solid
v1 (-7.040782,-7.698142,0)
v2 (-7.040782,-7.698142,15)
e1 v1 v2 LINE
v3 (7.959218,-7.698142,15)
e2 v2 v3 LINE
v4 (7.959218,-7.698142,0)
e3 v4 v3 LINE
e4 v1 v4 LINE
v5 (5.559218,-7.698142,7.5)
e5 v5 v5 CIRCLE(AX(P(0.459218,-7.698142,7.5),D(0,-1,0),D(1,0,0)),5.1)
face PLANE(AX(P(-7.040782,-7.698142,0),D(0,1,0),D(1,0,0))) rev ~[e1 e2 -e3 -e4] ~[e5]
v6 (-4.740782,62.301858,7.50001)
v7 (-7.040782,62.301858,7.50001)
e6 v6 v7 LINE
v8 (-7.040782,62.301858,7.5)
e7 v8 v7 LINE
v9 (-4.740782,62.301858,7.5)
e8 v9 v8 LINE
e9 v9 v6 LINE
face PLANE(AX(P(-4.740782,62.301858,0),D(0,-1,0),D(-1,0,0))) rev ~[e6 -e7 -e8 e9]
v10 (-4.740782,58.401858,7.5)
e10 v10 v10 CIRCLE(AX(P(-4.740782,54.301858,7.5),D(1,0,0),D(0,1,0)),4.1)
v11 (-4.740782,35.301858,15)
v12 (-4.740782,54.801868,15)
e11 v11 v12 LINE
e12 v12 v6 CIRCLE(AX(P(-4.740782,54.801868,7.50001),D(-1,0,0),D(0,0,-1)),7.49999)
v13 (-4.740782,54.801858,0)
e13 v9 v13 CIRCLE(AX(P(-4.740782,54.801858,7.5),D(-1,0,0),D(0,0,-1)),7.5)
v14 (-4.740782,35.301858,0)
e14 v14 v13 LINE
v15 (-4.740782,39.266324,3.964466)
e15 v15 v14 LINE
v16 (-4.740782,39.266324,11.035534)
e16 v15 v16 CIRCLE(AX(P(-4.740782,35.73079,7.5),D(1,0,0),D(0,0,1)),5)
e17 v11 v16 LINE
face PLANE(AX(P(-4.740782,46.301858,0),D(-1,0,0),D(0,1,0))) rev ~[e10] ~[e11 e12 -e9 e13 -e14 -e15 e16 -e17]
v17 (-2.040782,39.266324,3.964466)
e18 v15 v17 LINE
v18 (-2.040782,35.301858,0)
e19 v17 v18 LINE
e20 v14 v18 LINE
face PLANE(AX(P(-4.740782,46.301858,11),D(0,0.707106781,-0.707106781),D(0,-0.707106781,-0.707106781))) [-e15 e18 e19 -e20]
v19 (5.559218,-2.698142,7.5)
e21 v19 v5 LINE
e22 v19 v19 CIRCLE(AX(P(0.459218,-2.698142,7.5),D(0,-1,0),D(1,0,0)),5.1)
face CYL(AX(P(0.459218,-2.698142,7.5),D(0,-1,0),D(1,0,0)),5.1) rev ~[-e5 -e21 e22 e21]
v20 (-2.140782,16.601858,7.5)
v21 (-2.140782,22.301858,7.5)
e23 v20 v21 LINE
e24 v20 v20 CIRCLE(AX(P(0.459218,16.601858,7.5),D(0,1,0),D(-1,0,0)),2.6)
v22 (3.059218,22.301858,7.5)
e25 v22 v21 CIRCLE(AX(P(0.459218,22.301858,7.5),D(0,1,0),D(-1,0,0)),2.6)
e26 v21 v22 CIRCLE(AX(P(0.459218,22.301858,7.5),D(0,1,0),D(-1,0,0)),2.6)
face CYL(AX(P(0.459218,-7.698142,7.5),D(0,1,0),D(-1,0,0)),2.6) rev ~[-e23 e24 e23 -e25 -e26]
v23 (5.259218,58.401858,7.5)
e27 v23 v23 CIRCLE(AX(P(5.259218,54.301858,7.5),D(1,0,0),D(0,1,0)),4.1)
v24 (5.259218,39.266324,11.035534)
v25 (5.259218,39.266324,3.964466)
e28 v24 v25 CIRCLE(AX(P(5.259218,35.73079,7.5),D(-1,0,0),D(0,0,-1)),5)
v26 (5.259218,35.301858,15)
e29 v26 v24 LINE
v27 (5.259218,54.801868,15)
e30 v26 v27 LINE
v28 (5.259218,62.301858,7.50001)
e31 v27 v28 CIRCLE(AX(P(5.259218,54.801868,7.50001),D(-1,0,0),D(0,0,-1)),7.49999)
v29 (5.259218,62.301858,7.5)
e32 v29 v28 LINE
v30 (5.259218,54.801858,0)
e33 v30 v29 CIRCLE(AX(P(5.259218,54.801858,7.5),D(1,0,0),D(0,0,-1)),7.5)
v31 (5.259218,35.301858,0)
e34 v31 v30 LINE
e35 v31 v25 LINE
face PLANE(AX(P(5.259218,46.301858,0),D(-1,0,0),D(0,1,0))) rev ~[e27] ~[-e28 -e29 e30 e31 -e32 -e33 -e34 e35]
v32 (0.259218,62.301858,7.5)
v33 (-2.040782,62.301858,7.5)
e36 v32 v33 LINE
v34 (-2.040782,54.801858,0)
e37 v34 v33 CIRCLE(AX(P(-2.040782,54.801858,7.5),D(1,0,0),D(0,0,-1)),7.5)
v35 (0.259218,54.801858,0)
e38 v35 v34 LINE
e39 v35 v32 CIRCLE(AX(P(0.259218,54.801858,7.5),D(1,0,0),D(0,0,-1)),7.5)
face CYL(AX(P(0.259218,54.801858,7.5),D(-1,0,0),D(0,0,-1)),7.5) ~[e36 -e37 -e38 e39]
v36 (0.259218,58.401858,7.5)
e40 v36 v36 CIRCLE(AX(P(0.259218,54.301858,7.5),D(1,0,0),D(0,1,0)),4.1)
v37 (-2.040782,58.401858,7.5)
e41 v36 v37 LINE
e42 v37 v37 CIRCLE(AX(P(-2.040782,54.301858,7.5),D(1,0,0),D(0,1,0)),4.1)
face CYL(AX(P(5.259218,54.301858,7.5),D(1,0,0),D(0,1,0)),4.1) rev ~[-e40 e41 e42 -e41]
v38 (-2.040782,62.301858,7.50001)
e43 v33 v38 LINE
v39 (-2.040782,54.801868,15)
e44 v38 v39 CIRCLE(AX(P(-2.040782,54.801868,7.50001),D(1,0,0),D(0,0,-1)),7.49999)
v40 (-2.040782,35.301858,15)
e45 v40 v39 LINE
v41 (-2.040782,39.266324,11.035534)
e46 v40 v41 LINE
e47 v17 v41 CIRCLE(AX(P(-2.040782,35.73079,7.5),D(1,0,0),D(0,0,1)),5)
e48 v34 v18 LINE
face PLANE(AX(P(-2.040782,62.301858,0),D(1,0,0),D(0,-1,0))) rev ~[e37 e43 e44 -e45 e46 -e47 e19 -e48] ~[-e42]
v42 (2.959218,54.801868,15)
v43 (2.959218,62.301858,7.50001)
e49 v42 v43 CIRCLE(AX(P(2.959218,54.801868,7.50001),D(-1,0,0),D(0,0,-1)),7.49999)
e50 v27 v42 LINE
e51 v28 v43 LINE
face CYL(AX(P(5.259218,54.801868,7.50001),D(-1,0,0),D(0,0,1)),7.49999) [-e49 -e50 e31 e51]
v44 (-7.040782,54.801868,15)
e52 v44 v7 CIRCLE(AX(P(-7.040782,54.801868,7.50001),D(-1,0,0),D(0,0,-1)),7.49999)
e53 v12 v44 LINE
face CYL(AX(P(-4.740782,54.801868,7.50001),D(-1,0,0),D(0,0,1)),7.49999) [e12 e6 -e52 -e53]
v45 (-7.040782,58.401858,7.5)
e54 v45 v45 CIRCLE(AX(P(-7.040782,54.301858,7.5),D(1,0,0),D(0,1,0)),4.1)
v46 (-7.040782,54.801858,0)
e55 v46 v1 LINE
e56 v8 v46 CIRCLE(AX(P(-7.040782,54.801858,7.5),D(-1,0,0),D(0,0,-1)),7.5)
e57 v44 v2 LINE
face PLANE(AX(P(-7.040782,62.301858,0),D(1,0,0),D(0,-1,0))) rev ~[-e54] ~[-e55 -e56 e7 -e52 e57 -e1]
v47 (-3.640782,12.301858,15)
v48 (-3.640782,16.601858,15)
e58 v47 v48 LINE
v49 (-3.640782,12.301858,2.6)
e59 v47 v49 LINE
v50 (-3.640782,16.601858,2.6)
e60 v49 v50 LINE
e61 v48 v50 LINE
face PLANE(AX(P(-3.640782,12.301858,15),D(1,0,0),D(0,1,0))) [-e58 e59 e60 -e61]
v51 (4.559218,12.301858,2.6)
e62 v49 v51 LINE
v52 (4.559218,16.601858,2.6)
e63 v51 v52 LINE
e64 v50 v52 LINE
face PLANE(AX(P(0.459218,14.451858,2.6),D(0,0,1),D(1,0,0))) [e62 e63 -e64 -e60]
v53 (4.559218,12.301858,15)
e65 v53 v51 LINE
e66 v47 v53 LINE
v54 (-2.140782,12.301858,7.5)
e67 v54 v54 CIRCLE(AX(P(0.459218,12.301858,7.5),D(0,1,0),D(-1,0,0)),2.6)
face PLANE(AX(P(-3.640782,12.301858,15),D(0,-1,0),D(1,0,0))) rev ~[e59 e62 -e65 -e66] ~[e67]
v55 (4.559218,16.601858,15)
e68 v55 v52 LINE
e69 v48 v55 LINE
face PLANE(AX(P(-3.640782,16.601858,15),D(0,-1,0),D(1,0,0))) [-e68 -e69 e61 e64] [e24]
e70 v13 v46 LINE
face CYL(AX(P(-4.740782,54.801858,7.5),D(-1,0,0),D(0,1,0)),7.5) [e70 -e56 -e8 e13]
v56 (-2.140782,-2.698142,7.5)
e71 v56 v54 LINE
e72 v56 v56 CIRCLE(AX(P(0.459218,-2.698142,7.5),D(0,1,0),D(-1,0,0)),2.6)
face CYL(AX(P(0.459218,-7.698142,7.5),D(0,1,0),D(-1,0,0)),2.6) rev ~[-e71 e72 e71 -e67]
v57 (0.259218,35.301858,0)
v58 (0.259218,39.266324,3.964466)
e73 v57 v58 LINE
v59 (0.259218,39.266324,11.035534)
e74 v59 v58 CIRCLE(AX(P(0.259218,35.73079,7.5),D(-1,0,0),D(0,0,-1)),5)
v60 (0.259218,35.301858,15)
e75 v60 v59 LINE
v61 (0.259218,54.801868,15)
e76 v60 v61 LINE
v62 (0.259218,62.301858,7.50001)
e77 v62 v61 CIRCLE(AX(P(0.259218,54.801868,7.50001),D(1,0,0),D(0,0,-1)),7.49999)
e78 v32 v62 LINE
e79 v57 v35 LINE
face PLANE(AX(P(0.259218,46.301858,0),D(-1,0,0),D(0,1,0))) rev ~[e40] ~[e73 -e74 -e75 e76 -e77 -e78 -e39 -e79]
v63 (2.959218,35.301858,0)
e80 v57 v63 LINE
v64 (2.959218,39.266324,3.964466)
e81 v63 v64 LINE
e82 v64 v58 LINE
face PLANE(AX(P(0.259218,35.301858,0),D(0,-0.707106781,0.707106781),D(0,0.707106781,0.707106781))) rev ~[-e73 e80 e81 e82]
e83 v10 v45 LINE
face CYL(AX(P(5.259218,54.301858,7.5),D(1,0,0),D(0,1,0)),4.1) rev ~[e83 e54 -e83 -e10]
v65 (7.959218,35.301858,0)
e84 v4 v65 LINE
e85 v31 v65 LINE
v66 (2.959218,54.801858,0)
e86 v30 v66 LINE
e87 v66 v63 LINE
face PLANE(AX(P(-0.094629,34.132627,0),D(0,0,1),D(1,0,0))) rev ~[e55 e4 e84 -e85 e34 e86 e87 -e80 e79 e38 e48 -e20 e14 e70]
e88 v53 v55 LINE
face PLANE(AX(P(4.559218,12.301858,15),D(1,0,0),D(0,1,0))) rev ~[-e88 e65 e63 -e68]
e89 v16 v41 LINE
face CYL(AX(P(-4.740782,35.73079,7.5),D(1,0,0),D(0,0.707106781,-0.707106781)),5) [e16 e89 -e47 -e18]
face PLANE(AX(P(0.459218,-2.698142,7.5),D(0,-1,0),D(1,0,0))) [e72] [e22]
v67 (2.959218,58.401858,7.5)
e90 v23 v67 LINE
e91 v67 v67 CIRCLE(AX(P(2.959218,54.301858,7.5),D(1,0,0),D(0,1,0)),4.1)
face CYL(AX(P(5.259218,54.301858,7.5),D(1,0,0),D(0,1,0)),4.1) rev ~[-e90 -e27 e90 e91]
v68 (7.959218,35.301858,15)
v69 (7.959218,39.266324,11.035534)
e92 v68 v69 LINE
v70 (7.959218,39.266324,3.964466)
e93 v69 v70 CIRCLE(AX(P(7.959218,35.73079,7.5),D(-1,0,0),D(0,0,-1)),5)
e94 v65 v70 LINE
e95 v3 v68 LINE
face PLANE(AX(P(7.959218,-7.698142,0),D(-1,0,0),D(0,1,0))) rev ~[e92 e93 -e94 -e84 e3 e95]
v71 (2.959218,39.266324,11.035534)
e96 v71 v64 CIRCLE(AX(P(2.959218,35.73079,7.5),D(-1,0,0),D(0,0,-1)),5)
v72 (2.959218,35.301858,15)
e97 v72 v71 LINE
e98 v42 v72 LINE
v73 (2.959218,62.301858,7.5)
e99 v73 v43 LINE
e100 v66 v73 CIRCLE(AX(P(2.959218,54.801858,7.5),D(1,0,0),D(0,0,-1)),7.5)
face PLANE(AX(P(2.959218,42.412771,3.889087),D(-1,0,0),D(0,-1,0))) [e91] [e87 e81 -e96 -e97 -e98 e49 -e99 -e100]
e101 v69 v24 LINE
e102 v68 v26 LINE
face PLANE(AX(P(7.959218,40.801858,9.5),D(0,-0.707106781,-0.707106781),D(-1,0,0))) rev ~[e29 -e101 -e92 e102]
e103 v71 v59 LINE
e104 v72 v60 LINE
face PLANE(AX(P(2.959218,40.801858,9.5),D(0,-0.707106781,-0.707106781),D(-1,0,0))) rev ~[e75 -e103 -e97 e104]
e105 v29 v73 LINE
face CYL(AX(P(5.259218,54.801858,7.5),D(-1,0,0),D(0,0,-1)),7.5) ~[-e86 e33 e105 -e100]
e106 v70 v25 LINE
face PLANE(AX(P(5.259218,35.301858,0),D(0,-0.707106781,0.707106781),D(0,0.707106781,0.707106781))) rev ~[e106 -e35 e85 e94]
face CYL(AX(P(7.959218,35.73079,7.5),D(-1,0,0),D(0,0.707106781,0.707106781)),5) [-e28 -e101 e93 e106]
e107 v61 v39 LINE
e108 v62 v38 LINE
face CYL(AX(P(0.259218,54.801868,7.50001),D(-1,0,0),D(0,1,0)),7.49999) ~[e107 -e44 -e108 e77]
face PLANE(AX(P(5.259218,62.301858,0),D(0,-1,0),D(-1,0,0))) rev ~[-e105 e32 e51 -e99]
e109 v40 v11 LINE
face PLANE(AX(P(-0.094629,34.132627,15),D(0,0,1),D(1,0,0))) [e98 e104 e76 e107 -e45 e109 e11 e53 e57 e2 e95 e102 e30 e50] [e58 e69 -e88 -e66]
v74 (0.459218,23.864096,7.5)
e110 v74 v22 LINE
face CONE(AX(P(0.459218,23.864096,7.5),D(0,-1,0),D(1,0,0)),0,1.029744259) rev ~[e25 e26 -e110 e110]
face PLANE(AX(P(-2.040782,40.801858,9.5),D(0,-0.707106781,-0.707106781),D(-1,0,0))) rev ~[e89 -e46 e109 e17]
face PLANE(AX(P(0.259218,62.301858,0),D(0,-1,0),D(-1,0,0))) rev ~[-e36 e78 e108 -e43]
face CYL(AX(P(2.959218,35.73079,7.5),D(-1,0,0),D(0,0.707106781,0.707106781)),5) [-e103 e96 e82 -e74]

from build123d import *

# Parameters (mm, degrees)
F1_DEPTH       = 15
F3_D           = 5.2
F3_DEPTH       = 30
F3_CBORE_D     = 10.2
F3_CBORE_DEPTH = 5
F3_TIP         = 1.5622376095
F4_W           = 8.2
F4_H           = 4.3
F5_DEPTH       = 12.4
F6_R           = 4.1
F7_DEPTH       = 25
F8_R           = 7.5
F9_R           = 7.5
F10_R          = 7.49999
F11_SIZE       = 11
F12_T1_DEPTH   = 2.7
F12_T3_DEPTH   = 2.7
F12_T5_DEPTH   = 30.9885128676
F12_T10_DEPTH  = 59.2770257353
F12_T15_DEPTH  = 59.2770257353
F12_T21_DEPTH  = 59.2770257353
F12_T26_DEPTH  = 59.2770257353
F12_T32_DEPTH  = 59.2770257353
F12_T38_DEPTH  = 59.2770257353
F13_R          = 5


# Not quite as in the source:
# - a fillet or chamfer that OpenCascade refuses, or shapes differently, is made with other operations: its cross-section is extruded or revolved along the edge and cut away or added
# - a fillet or chamfer is up to 0.001 mm smaller than in the source, because OpenCascade refuses the exact size


with BuildPart() as f1:
    # F0 (on Top) → F1 (new body)
    with BuildSketch(Plane.XY):
        Polygon((-7.0407824647, 62.3018580846), (-7.0407824647, -7.6981419154), (7.9592175353, -7.6981419154), (7.9592175353, 46.3018580846), (5.2592175353, 46.3018580846), (5.2592175353, 62.3018580846), (2.9592175353, 62.3018580846), (2.9592175353, 46.3018580846), (0.2592175353, 46.3018580846), (0.2592175353, 62.3018580846), (-2.0407824647, 62.3018580846), (-2.0407824647, 46.3018580846), (-4.7407824647, 46.3018580846), (-4.7407824647, 62.3018580846), align=None)
    extrude(amount=F1_DEPTH)

    # F3
    with Locations(Plane.XZ.offset(7.6981419154)):
        with Locations((0.4592175353, 7.5)):
            CounterBoreHole(F3_D / 2, F3_CBORE_D / 2, F3_CBORE_DEPTH, depth=F3_DEPTH)
            with Locations((0, 0, -(F3_DEPTH + F3_TIP / 2))):  # 118° drill point
                Cone(0, F3_D / 2, F3_TIP, mode=Mode.SUBTRACT)

    # F4 (on face) → F5 (cut)
    with BuildSketch(Plane.XY.offset(15)):
        with Locations((0.4592175353, 14.4518580846)):
            Rectangle(F4_W, F4_H)
    extrude(amount=-F5_DEPTH, mode=Mode.SUBTRACT)

    # F6 (on face) → F7 (cut)
    with BuildSketch(Plane.YZ.offset(5.2592175353)):
        with Locations((54.3018580846, 7.5)):
            Circle(F6_R)
    extrude(amount=-F7_DEPTH, mode=Mode.SUBTRACT)

    # F8
    f8_edges = [f1.edges().sort_by_distance(p)[0] for p in [
        (-5.890782, 62.301858, 0),
    ]]
    fillet(f8_edges, radius=F8_R)

    # F9
    f9_edges = [f1.edges().sort_by_distance(p)[0] for p in [
        (-0.890782, 62.301858, 0),
        (4.109218, 62.301858, 0),
    ]]
    fillet(f9_edges, radius=F9_R)

    # F10 (radius 7.5 in the source; OpenCascade refuses exactly that, so slightly less here)
    f10_edges = [f1.edges().sort_by_distance(p)[0] for p in [
        (-5.890782, 62.301858, 15),
        (-0.890782, 62.301858, 15),
        (4.109218, 62.301858, 15),
    ]]
    fillet(f10_edges, radius=F10_R)

    # F11
    f11_edges = [f1.edges().sort_by_distance(p)[0] for p in [
        (-3.390782, 46.301858, 15),
        (1.609218, 46.301858, 15),
        (6.609218, 46.301858, 15),
    ]]
    chamfer(f11_edges, length=F11_SIZE)

    # F12: chamfer of 11 on 3 edges, made by hand

    # F12_s2 → F12_t1 (cut)
    with BuildSketch(Plane.YZ.offset(-4.7407824647)):
        Polygon((46.3018580846, 11), (35.3018580846, 0), (46.3018580846, 0), align=None)
    extrude(amount=F12_T1_DEPTH, mode=Mode.SUBTRACT)

    # F12_s4 → F12_t3 (cut)
    with BuildSketch(Plane.YZ.offset(0.2592175353)):
        Polygon((35.3018580846, 0), (46.3018580846, 11), (46.3018580846, 0), align=None)
    extrude(amount=F12_T3_DEPTH, mode=Mode.SUBTRACT)

    # F12_s6 → F12_t5 (cut)
    with BuildSketch(Plane.YZ.offset(5.2592175353)):
        Polygon((35.3018580846, 0), (46.3018580846, 11), (46.3018580846, 0), align=None)
    extrude(amount=F12_T5_DEPTH, mode=Mode.SUBTRACT)


with BuildPart() as f12_tool8:
    # F12_s9 → F12_t10 (new body)
    with BuildSketch(Plane.YZ.offset(26.247730403)):
        Polygon((46.3018580846, 11), (35.3018580846, 0), (46.3018580846, 0), align=None)
    extrude(amount=-F12_T10_DEPTH)

    split(bisect_by=Plane.YZ.offset(5.2592175353), keep=Keep.TOP)


with BuildPart() as f1_1:
    add(f1.part)

    # F12_t7: cut F12_tool8
    add(f12_tool8.part, mode=Mode.SUBTRACT)


with BuildPart() as f12_tool13:
    # F12_s14 → F12_t15 (new body)
    with BuildSketch(Plane.YZ.offset(26.247730403)):
        Polygon((46.3018580846, 11), (35.3018580846, 0), (46.3018580846, 0), align=None)
    extrude(amount=-F12_T15_DEPTH)

    split(bisect_by=Plane.YZ.offset(0.2592175353), keep=Keep.TOP)

    split(bisect_by=Plane.YZ.offset(2.9592175353), keep=Keep.BOTTOM)


with BuildPart() as f1_2:
    add(f1_1.part)

    # F12_t12: cut F12_tool13
    add(f12_tool13.part, mode=Mode.SUBTRACT)


with BuildPart() as f12_tool19:
    # F12_s20 → F12_t21 (new body)
    with BuildSketch(Plane.YZ.offset(31.247730403)):
        Polygon((35.3018580846, 0), (46.3018580846, 11), (46.3018580846, 0), align=None)
    extrude(amount=-F12_T21_DEPTH)

    split(bisect_by=Plane.YZ.offset(5.2592175353), keep=Keep.TOP)


with BuildPart() as f1_3:
    add(f1_2.part)

    # F12_t18: cut F12_tool19
    add(f12_tool19.part, mode=Mode.SUBTRACT)


with BuildPart() as f12_tool24:
    # F12_s25 → F12_t26 (new body)
    with BuildSketch(Plane.YZ.offset(31.247730403)):
        Polygon((35.3018580846, 0), (46.3018580846, 11), (46.3018580846, 0), align=None)
    extrude(amount=-F12_T26_DEPTH)

    split(bisect_by=Plane.YZ.offset(-2.0407824647), keep=Keep.BOTTOM)

    split(bisect_by=Plane.YZ.offset(-4.7407824647), keep=Keep.TOP)


with BuildPart() as f1_4:
    add(f1_3.part)

    # F12_t23: cut F12_tool24
    add(f12_tool24.part, mode=Mode.SUBTRACT)


with BuildPart() as f12_tool30:
    # F12_s31 → F12_t32 (new body)
    with BuildSketch(Plane.YZ.offset(36.247730403)):
        Polygon((35.3018580846, 0), (46.3018580846, 11), (46.3018580846, 0), align=None)
    extrude(amount=-F12_T32_DEPTH)

    split(bisect_by=Plane.YZ.offset(0.2592175353), keep=Keep.TOP)

    split(bisect_by=Plane.YZ.offset(2.9592175353), keep=Keep.BOTTOM)


with BuildPart() as f1_5:
    add(f1_4.part)

    # F12_t29: cut F12_tool30
    add(f12_tool30.part, mode=Mode.SUBTRACT)


with BuildPart() as f12_tool36:
    # F12_s37 → F12_t38 (new body)
    with BuildSketch(Plane.YZ.offset(36.247730403)):
        Polygon((35.3018580846, 0), (46.3018580846, 11), (46.3018580846, 0), align=None)
    extrude(amount=-F12_T38_DEPTH)

    split(bisect_by=Plane.YZ.offset(-2.0407824647), keep=Keep.BOTTOM)

    split(bisect_by=Plane.YZ.offset(-4.7407824647), keep=Keep.TOP)


with BuildPart() as f1_6:
    add(f1_5.part)

    # F12_t35: cut F12_tool36
    add(f12_tool36.part, mode=Mode.SUBTRACT)

    # F13
    f13_edges = [f1_6.edges().sort_by_distance(p)[0] for p in [
        (1.609218, 42.801858, 7.5),
        (6.609218, 42.801858, 7.5),
        (-3.390782, 42.801858, 7.5),
    ]]
    fillet(f13_edges, radius=F13_R)


solid = f1_6.part
